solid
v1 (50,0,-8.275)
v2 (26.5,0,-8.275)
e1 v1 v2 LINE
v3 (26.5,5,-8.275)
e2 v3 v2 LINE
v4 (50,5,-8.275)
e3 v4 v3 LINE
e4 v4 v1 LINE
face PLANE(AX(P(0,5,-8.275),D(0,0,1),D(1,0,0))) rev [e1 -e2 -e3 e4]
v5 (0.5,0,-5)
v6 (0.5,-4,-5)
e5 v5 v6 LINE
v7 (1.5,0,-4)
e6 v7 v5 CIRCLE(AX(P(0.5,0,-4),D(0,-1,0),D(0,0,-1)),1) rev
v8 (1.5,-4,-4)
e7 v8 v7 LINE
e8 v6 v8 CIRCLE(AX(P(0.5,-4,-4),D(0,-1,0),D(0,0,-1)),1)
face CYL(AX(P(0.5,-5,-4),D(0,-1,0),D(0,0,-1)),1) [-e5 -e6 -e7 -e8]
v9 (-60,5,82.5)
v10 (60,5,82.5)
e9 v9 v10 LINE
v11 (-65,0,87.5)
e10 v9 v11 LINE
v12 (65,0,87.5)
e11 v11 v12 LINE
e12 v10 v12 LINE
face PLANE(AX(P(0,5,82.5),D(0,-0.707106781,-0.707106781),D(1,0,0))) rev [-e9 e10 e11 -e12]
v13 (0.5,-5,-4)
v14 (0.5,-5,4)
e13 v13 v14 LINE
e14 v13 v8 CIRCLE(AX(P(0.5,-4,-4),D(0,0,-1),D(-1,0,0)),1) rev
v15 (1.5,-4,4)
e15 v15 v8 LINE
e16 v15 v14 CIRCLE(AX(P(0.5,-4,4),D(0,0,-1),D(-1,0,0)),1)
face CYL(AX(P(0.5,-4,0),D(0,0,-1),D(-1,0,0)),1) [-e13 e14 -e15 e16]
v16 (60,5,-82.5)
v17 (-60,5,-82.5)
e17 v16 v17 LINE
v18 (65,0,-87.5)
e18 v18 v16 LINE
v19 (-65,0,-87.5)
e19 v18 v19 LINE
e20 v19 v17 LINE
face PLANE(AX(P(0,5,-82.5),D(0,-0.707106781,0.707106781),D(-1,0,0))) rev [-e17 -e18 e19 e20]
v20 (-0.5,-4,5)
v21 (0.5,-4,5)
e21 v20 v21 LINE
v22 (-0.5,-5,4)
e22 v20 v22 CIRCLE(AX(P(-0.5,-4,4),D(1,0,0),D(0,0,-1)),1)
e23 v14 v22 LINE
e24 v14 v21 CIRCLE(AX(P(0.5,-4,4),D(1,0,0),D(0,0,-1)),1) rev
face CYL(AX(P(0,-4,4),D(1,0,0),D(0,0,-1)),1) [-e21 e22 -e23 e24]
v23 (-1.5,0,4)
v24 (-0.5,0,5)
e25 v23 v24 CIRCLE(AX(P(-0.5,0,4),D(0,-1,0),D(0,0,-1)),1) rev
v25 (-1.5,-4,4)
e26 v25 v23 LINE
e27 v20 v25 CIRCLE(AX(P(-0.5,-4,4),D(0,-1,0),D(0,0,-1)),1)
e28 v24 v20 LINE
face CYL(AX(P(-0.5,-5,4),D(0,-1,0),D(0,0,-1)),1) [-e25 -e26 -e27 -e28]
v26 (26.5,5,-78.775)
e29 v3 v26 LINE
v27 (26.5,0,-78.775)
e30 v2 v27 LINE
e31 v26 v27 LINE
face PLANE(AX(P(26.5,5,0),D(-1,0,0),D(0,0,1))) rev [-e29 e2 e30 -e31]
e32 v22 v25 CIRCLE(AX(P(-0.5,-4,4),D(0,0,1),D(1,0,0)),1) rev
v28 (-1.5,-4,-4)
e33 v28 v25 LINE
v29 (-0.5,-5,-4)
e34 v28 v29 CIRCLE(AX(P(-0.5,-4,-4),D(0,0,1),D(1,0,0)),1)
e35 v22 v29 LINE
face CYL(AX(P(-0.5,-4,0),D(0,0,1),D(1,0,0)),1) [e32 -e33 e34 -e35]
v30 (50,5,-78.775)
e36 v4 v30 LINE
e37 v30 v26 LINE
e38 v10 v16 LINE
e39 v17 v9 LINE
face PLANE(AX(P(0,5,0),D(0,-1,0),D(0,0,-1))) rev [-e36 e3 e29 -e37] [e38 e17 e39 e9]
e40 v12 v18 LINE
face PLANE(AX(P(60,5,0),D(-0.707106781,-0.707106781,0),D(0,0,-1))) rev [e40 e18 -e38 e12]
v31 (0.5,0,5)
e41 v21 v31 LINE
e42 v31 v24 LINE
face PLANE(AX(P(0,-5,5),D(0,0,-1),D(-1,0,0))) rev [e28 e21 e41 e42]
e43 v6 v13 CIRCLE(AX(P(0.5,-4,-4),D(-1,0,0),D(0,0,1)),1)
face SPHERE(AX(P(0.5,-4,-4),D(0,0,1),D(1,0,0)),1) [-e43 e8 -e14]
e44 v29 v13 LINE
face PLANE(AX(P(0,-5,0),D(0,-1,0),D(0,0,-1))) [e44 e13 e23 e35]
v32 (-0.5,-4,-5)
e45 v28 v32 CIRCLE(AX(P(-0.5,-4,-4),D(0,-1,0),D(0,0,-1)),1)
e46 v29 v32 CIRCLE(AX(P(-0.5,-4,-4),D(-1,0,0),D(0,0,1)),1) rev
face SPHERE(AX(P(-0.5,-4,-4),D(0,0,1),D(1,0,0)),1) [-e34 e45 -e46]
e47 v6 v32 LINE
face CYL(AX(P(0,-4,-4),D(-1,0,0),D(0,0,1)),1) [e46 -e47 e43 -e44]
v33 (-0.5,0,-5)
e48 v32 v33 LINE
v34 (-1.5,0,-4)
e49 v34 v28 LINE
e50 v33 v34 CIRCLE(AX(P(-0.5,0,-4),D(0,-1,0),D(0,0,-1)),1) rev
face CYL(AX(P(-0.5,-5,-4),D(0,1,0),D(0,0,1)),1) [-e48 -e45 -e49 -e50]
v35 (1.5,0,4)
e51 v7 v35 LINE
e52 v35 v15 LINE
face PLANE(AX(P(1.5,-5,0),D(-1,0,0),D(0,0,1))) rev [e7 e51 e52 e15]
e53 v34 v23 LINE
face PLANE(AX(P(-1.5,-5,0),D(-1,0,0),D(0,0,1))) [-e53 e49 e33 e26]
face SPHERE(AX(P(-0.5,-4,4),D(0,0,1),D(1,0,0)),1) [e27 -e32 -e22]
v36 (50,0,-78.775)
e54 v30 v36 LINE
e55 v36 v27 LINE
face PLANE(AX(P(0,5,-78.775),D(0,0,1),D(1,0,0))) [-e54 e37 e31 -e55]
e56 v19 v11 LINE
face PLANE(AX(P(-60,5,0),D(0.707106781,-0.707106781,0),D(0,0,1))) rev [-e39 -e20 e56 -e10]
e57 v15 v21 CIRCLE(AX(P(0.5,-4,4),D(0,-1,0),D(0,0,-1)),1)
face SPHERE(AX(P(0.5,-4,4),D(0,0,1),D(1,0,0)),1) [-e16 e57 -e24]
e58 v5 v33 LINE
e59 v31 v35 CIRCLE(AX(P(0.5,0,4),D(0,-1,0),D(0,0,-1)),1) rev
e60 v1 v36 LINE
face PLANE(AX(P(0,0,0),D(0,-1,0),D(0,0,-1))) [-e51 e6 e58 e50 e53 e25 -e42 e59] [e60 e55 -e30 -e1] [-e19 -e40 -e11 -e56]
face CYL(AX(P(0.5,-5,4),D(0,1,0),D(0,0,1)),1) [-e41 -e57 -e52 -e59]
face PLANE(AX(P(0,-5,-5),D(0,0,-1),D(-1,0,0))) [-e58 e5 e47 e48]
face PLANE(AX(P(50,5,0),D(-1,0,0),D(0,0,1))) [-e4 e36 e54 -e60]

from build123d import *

# Parameters (mm, degrees)
SKETCH1_W           = 130
SKETCH1_H           = 175
BOSS_EXTRUDE1_DEPTH = 5
CHAMFER1_SIZE       = 5
SKETCH2_W           = 1.5
SKETCH2_H           = 5
BOSS_EXTRUDE2_DEPTH = 5
FILLET2_R           = 1
FILLET3_R           = 1
CUT_EXTRUDE1_DEPTH  = 5


# Some blends are built 0.0001 mm under size
with BuildPart() as part:
    # Sketch1 → Boss-Extrude1 (new body)
    with BuildSketch(Plane(origin=(0, 0, 0), x_dir=(1, 0, 0), z_dir=(0, 1, 0))):
        Rectangle(SKETCH1_W, SKETCH1_H)
    extrude(amount=BOSS_EXTRUDE1_DEPTH)

    # Chamfer1
    chamfer1_edges = [part.edges().sort_by_distance(p)[0] for p in [
        (65, 5, 0),
        (0, 5, -87.5),
        (-65, 5, 0),
        (0, 5, 87.5),
    ]]
    chamfer(chamfer1_edges, length=CHAMFER1_SIZE - 0.0001)  # a hair under: the kernel refuses the full size

    # Sketch2 → Boss-Extrude2 (add)
    with BuildSketch(Plane.XZ):
        Polygon((0, 5), (0, 0), (-1.5, 0), (-1.5, -5), (1.5, -5), (1.5, 5), align=None)
        with Locations((-0.75, 2.5)):
            Rectangle(SKETCH2_W, SKETCH2_H)
    extrude(amount=BOSS_EXTRUDE2_DEPTH)

    # Fillet2
    fillet2_edges = [part.edges().sort_by_distance(p)[0] for p in [
        (-1.5, -5, 0),
        (0, -5, -5),
        (0, -5, 5),
        (1.5, -5, 0),
    ]]
    fillet(fillet2_edges, radius=FILLET2_R)

    # Fillet3
    # the kernel refuses this fillet: 1 mm, written as the material it takes off along each edge
    with BuildSketch(Plane(origin=(-0.5, -4, -4), x_dir=(0, 0, -1), z_dir=(-1, 0, 0))) as fillet3_piece_1_section:
        Polygon((0, 0), (FILLET3_R, 0), (FILLET3_R, FILLET3_R), (0, FILLET3_R), align=None)
    fillet3_piece_1 = extrude(amount=FILLET3_R, mode=Mode.PRIVATE)
    fillet3_piece_1 = fillet3_piece_1 - Plane(origin=(-0.5, -4, -4), x_dir=(0, 0.7071067811865475, 0.7071067811865475), z_dir=(-1, 0, 0)) * Sphere(FILLET3_R, mode=Mode.PRIVATE)
    add(fillet3_piece_1, mode=Mode.SUBTRACT)
    with BuildSketch(Plane(origin=(-0.5, -4, 4), x_dir=(-1, 0, 0), z_dir=(0, 0, 1))) as fillet3_piece_2_section:
        Polygon((0, 0), (FILLET3_R, 0), (FILLET3_R, FILLET3_R), (0, FILLET3_R), align=None)
    fillet3_piece_2 = extrude(amount=FILLET3_R, mode=Mode.PRIVATE)
    fillet3_piece_2 = fillet3_piece_2 - Plane(origin=(-0.5, -4, 4), x_dir=(0.7071067811865475, 0.7071067811865475, 0), z_dir=(0, 0, 1)) * Sphere(FILLET3_R, mode=Mode.PRIVATE)
    add(fillet3_piece_2, mode=Mode.SUBTRACT)
    with BuildSketch(Plane(origin=(0.5, -4, -4), x_dir=(0, 0, -1), z_dir=(1, 0, 0))) as fillet3_piece_3_section:
        Polygon((0, 0), (FILLET3_R, 0), (FILLET3_R, -FILLET3_R), (0, -FILLET3_R), align=None)
    fillet3_piece_3 = extrude(amount=FILLET3_R, mode=Mode.PRIVATE)
    fillet3_piece_3 = fillet3_piece_3 - Plane(origin=(0.5, -4, -4), x_dir=(0, 0.7071067811865475, 0.7071067811865475), z_dir=(1, 0, 0)) * Sphere(FILLET3_R, mode=Mode.PRIVATE)
    add(fillet3_piece_3, mode=Mode.SUBTRACT)
    with BuildSketch(Plane(origin=(0.5, -4, 4), x_dir=(1, 0, 0), z_dir=(0, 0, 1))) as fillet3_piece_4_section:
        Polygon((0, 0), (FILLET3_R, 0), (FILLET3_R, -FILLET3_R), (0, -FILLET3_R), align=None)
    fillet3_piece_4 = extrude(amount=FILLET3_R, mode=Mode.PRIVATE)
    fillet3_piece_4 = fillet3_piece_4 - Plane(origin=(0.5, -4, 4), x_dir=(-0.7071067811865475, 0.7071067811865475, 0), z_dir=(0, 0, 1)) * Sphere(FILLET3_R, mode=Mode.PRIVATE)
    add(fillet3_piece_4, mode=Mode.SUBTRACT)
    with BuildSketch(Plane(origin=(1.5, 0, 5), x_dir=(-1, 0, 0), z_dir=(0, -1, 0)), Plane(origin=(1.5, 0, -5), x_dir=(0, 0, 1), z_dir=(0, -1, 0))) as fillet3_piece_5:
        with BuildLine():
            CenterArc((FILLET3_R, FILLET3_R), FILLET3_R, 180, 90)
            Line((0, FILLET3_R), (0, 0))
            Line((0, 0), (FILLET3_R, 0))
        make_face()
    extrude(amount=4, mode=Mode.SUBTRACT)
    with BuildSketch(Plane(origin=(-1.5, 0, -5), x_dir=(0, 0, 1), z_dir=(0, -1, 0)), Plane(origin=(-1.5, 0, 5), x_dir=(1, 0, 0), z_dir=(0, -1, 0))) as fillet3_piece_6:
        with BuildLine():
            CenterArc((FILLET3_R, -FILLET3_R), FILLET3_R, 90, 90)
            Line((0, -FILLET3_R), (0, 0))
            Line((0, 0), (FILLET3_R, 0))
        make_face()
    extrude(amount=4, mode=Mode.SUBTRACT)

    # Sketch4 → Cut-Extrude1 (cut)
    with BuildSketch(Plane.XZ):
        Polygon((50, -78.775), (26.5, -78.775), (26.5, -8.275), (50, -8.275), (50, -43.75), align=None)
    extrude(amount=-CUT_EXTRUDE1_DEPTH, mode=Mode.SUBTRACT)


solid = part.part
